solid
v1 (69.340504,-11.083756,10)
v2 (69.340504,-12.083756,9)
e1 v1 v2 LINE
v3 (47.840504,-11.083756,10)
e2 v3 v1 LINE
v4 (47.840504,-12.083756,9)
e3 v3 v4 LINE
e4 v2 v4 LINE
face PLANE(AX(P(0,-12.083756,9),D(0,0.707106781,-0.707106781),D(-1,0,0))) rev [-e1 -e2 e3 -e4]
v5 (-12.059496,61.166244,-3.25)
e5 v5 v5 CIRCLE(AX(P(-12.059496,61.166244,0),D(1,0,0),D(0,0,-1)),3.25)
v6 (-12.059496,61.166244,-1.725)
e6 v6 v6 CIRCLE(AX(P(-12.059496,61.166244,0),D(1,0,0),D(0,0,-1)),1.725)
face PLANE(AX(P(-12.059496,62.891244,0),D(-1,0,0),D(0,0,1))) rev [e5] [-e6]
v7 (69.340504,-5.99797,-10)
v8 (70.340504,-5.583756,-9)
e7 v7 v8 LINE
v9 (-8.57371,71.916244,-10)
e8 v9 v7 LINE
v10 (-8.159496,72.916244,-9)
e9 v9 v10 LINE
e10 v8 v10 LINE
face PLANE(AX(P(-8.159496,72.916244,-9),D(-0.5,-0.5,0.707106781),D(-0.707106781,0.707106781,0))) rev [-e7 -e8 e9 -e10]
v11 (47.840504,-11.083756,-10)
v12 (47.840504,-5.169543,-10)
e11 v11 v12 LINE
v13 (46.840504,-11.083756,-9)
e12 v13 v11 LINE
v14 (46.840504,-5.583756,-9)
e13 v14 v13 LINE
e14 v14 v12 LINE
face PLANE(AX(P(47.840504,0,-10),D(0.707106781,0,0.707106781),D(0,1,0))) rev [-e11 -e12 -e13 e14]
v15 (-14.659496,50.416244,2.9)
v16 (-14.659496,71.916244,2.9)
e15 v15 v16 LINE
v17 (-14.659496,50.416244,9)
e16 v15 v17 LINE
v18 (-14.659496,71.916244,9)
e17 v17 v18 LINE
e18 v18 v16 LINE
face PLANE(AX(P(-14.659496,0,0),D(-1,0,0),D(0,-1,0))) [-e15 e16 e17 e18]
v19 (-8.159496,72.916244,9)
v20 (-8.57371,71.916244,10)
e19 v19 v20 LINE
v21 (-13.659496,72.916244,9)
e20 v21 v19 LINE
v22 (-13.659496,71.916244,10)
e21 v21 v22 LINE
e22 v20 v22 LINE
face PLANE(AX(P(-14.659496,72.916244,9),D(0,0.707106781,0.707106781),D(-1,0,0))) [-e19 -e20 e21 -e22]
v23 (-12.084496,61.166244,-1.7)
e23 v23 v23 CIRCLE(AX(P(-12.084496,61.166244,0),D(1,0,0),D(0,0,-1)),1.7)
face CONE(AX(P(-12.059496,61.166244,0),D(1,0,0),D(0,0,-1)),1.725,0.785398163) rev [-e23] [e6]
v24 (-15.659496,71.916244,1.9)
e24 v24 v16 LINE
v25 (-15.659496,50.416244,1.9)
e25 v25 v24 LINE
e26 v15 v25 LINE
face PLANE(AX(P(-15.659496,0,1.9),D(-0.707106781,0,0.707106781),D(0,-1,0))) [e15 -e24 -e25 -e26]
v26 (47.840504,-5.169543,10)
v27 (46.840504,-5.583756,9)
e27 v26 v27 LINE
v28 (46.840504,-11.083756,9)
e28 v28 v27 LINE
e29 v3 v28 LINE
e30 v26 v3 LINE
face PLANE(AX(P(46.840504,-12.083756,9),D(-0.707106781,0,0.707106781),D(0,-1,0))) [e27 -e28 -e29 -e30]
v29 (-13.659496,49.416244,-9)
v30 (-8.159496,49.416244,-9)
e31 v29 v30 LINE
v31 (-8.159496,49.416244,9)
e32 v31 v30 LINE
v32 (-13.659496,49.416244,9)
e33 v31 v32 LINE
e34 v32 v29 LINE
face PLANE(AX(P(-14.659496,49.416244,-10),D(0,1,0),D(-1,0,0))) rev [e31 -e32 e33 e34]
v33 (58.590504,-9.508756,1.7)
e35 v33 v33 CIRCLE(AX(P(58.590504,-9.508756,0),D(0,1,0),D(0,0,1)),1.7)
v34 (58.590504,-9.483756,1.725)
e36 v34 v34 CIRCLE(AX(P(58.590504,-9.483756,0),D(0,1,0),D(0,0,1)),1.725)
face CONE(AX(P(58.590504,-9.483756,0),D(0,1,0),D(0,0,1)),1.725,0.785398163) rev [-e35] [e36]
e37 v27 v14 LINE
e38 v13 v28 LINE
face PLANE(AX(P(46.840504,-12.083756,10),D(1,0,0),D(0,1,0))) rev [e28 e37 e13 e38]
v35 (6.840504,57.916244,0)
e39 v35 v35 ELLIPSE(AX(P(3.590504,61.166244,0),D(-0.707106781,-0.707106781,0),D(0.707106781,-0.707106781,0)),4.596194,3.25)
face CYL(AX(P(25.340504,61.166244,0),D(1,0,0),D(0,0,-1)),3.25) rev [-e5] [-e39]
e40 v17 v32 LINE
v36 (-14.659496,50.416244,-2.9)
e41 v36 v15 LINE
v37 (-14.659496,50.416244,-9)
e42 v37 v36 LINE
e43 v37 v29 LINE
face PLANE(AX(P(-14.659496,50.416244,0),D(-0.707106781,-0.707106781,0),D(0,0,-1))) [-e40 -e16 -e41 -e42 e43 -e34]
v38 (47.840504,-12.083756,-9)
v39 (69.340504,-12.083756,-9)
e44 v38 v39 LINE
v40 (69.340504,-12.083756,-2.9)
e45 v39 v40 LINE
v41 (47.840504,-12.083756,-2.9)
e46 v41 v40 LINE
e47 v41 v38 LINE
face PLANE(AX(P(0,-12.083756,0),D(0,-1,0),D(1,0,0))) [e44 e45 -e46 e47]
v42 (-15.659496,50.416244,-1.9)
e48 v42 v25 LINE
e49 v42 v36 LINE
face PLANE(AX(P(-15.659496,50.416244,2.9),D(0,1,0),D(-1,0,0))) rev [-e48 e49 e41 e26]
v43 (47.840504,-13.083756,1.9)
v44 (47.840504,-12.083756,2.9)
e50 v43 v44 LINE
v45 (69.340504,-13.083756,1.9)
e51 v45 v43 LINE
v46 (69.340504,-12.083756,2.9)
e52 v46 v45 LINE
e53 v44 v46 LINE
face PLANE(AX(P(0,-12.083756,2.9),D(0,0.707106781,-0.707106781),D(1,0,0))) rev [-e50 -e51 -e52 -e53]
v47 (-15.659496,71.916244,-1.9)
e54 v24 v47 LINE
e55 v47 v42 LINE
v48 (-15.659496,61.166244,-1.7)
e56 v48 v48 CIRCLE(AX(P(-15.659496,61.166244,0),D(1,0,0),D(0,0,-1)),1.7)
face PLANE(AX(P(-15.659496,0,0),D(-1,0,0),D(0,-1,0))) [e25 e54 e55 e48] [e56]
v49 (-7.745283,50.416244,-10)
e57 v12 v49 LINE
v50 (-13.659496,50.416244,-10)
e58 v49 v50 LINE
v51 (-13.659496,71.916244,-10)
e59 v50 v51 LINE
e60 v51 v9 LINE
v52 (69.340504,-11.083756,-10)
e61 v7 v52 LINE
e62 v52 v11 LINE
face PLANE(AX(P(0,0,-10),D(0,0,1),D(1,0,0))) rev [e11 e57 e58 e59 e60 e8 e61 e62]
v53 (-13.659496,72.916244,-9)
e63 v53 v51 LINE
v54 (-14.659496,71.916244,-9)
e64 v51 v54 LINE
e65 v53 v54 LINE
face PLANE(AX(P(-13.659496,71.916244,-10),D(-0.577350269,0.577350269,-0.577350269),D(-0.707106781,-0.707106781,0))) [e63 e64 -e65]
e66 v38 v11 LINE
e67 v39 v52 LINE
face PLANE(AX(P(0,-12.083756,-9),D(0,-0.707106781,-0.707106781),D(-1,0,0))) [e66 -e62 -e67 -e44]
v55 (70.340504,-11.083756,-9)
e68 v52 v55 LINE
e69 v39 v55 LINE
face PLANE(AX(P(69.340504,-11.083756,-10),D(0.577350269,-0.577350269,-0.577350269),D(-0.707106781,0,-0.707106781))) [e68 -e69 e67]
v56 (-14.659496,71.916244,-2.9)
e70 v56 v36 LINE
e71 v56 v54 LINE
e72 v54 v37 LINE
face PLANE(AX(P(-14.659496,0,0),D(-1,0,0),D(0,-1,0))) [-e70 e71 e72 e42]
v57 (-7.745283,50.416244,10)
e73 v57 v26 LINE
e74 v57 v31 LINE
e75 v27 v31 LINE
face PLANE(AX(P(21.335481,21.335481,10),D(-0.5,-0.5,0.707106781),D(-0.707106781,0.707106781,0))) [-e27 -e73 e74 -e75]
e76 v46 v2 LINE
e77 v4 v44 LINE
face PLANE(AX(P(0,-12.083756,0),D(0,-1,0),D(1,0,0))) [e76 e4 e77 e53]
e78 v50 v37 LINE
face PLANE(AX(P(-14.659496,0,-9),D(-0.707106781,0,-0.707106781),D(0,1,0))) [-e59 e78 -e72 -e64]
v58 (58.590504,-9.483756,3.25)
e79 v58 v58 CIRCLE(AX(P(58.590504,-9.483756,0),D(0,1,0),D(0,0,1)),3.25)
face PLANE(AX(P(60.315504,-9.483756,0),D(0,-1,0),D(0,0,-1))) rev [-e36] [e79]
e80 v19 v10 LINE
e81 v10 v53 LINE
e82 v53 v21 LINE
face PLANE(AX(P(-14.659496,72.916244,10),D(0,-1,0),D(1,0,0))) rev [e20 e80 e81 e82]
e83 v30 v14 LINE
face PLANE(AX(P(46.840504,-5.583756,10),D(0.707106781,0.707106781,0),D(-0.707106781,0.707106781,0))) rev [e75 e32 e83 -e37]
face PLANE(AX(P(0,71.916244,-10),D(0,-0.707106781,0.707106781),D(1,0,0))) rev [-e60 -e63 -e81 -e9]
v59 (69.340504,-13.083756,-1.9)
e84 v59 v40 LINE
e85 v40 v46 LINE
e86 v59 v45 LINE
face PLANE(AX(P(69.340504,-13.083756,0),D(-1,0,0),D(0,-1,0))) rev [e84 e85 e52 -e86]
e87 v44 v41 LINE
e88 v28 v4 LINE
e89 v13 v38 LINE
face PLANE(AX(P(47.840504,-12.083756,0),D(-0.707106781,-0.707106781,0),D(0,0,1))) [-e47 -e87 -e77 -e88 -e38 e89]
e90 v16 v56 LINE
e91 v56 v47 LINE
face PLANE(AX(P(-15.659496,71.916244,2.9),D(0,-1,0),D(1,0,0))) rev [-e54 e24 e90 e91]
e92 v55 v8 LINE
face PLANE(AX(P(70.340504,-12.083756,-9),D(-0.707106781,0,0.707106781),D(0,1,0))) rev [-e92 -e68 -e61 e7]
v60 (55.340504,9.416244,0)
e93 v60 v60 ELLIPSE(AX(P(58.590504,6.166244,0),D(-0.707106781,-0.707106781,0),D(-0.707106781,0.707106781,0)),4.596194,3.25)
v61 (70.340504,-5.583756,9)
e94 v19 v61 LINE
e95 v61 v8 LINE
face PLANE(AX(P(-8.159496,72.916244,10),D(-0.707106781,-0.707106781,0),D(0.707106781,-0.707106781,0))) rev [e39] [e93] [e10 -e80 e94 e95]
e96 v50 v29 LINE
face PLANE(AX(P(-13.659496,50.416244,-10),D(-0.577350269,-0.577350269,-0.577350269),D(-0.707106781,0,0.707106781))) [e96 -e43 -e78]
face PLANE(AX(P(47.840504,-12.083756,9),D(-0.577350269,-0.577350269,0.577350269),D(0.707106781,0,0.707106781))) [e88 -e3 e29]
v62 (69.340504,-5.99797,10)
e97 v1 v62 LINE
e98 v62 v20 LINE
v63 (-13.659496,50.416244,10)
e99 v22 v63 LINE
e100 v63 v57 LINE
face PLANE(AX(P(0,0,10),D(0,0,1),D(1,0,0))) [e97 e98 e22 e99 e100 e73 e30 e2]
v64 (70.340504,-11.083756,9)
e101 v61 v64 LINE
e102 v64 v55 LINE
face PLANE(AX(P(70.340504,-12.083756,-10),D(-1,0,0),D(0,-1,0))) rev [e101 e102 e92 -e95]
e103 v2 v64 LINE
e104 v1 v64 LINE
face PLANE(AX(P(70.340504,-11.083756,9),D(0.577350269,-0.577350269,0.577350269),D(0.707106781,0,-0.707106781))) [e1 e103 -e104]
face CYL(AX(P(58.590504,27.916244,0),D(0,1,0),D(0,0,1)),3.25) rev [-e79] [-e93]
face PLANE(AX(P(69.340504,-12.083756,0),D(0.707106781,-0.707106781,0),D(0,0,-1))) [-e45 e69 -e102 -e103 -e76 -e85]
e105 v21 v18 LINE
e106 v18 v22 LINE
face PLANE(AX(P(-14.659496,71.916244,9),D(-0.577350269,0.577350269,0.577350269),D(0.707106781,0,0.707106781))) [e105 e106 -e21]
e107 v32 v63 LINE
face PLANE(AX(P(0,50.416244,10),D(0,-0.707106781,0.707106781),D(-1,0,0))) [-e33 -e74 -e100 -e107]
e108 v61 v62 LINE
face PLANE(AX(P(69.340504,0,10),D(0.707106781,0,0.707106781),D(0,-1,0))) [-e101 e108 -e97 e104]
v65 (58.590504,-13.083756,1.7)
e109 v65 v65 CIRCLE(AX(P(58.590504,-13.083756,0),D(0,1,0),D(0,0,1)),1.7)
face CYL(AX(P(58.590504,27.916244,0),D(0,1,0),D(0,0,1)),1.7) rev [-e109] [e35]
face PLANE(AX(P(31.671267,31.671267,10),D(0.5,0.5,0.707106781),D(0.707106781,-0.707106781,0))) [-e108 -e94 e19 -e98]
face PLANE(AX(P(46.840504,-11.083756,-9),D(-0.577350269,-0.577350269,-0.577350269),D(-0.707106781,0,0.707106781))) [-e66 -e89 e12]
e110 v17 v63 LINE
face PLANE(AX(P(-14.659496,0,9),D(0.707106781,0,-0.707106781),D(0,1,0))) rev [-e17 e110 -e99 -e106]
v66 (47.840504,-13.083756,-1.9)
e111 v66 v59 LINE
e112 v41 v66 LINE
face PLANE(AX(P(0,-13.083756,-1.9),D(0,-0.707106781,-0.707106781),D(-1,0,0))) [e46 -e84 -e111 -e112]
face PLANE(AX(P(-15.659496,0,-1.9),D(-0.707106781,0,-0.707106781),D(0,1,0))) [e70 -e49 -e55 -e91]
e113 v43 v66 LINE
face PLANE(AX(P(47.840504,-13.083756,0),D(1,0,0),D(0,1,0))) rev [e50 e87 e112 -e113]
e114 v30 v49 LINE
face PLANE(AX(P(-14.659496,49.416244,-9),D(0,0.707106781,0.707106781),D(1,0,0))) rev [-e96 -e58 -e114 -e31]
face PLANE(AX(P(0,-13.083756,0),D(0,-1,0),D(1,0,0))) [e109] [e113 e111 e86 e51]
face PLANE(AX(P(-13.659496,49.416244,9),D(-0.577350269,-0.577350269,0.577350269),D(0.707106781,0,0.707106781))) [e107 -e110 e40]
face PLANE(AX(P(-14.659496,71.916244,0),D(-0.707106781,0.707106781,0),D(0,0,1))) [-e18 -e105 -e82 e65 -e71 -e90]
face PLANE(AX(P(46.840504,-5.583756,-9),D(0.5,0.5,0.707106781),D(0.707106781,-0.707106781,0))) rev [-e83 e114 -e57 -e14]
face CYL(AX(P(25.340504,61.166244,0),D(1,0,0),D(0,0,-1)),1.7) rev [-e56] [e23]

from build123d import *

# Parameters (mm, degrees)
BOSS_EXTRUDE1_DEPTH = 10
SKETCH29_W          = 20
SKETCH29_H          = 23.5
BOSS_EXTRUDE4_DEPTH = 6.5
SKETCH30_W          = 23.5
SKETCH30_H          = 20
BOSS_EXTRUDE5_DEPTH = 6.5
CHAMFER1_SIZE       = 1
SKETCH4_W           = 21.5
SKETCH4_H           = 5.8
BOSS_EXTRUDE2_DEPTH = 1
SKETCH5_W           = 5.8
SKETCH5_H           = 21.5
BOSS_EXTRUDE3_DEPTH = 1
CHAMFER2_SIZE       = 1


with BuildPart() as part:
    # Sketch2 → Boss-Extrude1 (new, symmetric)
    with BuildSketch(Plane.XY):
        Polygon((-8.159496186, 72.916243655), (70.340503814, -5.583756345), (46.840503814, -5.583756345), (-8.159496186, 49.416243655), align=None)
    extrude(amount=BOSS_EXTRUDE1_DEPTH, both=True)

    # Sketch29 → Boss-Extrude4 (add)
    with BuildSketch(Plane.ZY.offset(8.159496186)):
        with Locations((0, 61.166243655)):
            Rectangle(SKETCH29_W, SKETCH29_H)
    extrude(amount=BOSS_EXTRUDE4_DEPTH)

    # Sketch30 → Boss-Extrude5 (add)
    with BuildSketch(Plane.XZ.offset(5.583756345)):
        with Locations((58.590503814, 0)):
            Rectangle(SKETCH30_W, SKETCH30_H)
    extrude(amount=BOSS_EXTRUDE5_DEPTH)

    # Chamfer1
    chamfer1_edges = [part.edges().sort_by_distance(p)[0] for p in [
        (-11.409496186, 72.916243655, 10),
        (-11.409496186, 72.916243655, -10),
        (-11.409496186, 49.416243655, -10),
        (-11.409496186, 49.416243655, 10),
        (-14.659496186, 72.916243655, 0),
        (-14.659496186, 61.166243655, -10),
        (31.090503814, 33.666243655, 10),
        (-14.659496186, 49.416243655, 0),
        (-14.659496186, 61.166243655, 10),
        (46.840503814, -8.833756345, 10),
        (46.840503814, -8.833756345, -10),
        (70.340503814, -8.833756345, -10),
        (70.340503814, -8.833756345, 10),
        (46.840503814, -12.083756345, 0),
        (58.590503814, -12.083756345, -10),
        (70.340503814, -12.083756345, 0),
        (58.590503814, -12.083756345, 10),
        (31.090503814, 33.666243655, -10),
        (19.340503814, 21.916243655, -10),
        (19.340503814, 21.916243655, 10),
    ]]
    chamfer(chamfer1_edges, length=CHAMFER1_SIZE)

    # Sketch4 → Boss-Extrude2 (add)
    with BuildSketch(Plane.XZ.offset(12.083756345)):
        with Locations((58.590503814, 0)):
            Rectangle(SKETCH4_W, SKETCH4_H)
    extrude(amount=BOSS_EXTRUDE2_DEPTH)

    # Sketch5 → Boss-Extrude3 (add)
    with BuildSketch(Plane.ZY.offset(14.659496186)):
        with Locations((0, 61.166243655)):
            Rectangle(SKETCH5_W, SKETCH5_H)
    extrude(amount=BOSS_EXTRUDE3_DEPTH)

    # Chamfer2
    chamfer2_edges = [part.edges().sort_by_distance(p)[0] for p in [
        (-15.659496186, 61.166243655, 2.9),
        (-15.659496186, 61.166243655, -2.9),
        (58.590503814, -13.083756345, -2.9),
        (58.590503814, -13.083756345, 2.9),
    ]]
    chamfer(chamfer2_edges, length=CHAMFER2_SIZE - 0.0001)  # a hair under: the kernel refuses the full size

    # Sketch34 → CBORE for M3 Hex Socket Head Cap Screw4 (revolve, cut)
    with BuildSketch(Plane(origin=(25.340503814, 61.166243655, 0), x_dir=(0, 0, -1), z_dir=(0, 1, 0))):
        Polygon((0, 0), (0, 41), (1.7, 41), (1.7, 37.425), (1.725, 37.4), (3.25, 37.4), (3.25, 0.025), (3.275, 0), align=None)
    revolve(axis=Axis((31.690503814, 61.166243655, 0), (-1, 0, 0)), mode=Mode.SUBTRACT)

    # Sketch36 → CBORE for M3 Hex Socket Head Cap Screw5 (revolve, cut)
    with BuildSketch(Plane(origin=(58.590503814, 27.916243655, 0), x_dir=(0, 0, 1), z_dir=(1, 0, 0))):
        Polygon((0, 0), (0, 41), (1.7, 41), (1.7, 37.425), (1.725, 37.4), (3.25, 37.4), (3.25, 0.025), (3.275, 0), align=None)
    revolve(axis=Axis((58.590503814, 34.266243655, 0), (0, -1, 0)), mode=Mode.SUBTRACT)


solid = part.part
